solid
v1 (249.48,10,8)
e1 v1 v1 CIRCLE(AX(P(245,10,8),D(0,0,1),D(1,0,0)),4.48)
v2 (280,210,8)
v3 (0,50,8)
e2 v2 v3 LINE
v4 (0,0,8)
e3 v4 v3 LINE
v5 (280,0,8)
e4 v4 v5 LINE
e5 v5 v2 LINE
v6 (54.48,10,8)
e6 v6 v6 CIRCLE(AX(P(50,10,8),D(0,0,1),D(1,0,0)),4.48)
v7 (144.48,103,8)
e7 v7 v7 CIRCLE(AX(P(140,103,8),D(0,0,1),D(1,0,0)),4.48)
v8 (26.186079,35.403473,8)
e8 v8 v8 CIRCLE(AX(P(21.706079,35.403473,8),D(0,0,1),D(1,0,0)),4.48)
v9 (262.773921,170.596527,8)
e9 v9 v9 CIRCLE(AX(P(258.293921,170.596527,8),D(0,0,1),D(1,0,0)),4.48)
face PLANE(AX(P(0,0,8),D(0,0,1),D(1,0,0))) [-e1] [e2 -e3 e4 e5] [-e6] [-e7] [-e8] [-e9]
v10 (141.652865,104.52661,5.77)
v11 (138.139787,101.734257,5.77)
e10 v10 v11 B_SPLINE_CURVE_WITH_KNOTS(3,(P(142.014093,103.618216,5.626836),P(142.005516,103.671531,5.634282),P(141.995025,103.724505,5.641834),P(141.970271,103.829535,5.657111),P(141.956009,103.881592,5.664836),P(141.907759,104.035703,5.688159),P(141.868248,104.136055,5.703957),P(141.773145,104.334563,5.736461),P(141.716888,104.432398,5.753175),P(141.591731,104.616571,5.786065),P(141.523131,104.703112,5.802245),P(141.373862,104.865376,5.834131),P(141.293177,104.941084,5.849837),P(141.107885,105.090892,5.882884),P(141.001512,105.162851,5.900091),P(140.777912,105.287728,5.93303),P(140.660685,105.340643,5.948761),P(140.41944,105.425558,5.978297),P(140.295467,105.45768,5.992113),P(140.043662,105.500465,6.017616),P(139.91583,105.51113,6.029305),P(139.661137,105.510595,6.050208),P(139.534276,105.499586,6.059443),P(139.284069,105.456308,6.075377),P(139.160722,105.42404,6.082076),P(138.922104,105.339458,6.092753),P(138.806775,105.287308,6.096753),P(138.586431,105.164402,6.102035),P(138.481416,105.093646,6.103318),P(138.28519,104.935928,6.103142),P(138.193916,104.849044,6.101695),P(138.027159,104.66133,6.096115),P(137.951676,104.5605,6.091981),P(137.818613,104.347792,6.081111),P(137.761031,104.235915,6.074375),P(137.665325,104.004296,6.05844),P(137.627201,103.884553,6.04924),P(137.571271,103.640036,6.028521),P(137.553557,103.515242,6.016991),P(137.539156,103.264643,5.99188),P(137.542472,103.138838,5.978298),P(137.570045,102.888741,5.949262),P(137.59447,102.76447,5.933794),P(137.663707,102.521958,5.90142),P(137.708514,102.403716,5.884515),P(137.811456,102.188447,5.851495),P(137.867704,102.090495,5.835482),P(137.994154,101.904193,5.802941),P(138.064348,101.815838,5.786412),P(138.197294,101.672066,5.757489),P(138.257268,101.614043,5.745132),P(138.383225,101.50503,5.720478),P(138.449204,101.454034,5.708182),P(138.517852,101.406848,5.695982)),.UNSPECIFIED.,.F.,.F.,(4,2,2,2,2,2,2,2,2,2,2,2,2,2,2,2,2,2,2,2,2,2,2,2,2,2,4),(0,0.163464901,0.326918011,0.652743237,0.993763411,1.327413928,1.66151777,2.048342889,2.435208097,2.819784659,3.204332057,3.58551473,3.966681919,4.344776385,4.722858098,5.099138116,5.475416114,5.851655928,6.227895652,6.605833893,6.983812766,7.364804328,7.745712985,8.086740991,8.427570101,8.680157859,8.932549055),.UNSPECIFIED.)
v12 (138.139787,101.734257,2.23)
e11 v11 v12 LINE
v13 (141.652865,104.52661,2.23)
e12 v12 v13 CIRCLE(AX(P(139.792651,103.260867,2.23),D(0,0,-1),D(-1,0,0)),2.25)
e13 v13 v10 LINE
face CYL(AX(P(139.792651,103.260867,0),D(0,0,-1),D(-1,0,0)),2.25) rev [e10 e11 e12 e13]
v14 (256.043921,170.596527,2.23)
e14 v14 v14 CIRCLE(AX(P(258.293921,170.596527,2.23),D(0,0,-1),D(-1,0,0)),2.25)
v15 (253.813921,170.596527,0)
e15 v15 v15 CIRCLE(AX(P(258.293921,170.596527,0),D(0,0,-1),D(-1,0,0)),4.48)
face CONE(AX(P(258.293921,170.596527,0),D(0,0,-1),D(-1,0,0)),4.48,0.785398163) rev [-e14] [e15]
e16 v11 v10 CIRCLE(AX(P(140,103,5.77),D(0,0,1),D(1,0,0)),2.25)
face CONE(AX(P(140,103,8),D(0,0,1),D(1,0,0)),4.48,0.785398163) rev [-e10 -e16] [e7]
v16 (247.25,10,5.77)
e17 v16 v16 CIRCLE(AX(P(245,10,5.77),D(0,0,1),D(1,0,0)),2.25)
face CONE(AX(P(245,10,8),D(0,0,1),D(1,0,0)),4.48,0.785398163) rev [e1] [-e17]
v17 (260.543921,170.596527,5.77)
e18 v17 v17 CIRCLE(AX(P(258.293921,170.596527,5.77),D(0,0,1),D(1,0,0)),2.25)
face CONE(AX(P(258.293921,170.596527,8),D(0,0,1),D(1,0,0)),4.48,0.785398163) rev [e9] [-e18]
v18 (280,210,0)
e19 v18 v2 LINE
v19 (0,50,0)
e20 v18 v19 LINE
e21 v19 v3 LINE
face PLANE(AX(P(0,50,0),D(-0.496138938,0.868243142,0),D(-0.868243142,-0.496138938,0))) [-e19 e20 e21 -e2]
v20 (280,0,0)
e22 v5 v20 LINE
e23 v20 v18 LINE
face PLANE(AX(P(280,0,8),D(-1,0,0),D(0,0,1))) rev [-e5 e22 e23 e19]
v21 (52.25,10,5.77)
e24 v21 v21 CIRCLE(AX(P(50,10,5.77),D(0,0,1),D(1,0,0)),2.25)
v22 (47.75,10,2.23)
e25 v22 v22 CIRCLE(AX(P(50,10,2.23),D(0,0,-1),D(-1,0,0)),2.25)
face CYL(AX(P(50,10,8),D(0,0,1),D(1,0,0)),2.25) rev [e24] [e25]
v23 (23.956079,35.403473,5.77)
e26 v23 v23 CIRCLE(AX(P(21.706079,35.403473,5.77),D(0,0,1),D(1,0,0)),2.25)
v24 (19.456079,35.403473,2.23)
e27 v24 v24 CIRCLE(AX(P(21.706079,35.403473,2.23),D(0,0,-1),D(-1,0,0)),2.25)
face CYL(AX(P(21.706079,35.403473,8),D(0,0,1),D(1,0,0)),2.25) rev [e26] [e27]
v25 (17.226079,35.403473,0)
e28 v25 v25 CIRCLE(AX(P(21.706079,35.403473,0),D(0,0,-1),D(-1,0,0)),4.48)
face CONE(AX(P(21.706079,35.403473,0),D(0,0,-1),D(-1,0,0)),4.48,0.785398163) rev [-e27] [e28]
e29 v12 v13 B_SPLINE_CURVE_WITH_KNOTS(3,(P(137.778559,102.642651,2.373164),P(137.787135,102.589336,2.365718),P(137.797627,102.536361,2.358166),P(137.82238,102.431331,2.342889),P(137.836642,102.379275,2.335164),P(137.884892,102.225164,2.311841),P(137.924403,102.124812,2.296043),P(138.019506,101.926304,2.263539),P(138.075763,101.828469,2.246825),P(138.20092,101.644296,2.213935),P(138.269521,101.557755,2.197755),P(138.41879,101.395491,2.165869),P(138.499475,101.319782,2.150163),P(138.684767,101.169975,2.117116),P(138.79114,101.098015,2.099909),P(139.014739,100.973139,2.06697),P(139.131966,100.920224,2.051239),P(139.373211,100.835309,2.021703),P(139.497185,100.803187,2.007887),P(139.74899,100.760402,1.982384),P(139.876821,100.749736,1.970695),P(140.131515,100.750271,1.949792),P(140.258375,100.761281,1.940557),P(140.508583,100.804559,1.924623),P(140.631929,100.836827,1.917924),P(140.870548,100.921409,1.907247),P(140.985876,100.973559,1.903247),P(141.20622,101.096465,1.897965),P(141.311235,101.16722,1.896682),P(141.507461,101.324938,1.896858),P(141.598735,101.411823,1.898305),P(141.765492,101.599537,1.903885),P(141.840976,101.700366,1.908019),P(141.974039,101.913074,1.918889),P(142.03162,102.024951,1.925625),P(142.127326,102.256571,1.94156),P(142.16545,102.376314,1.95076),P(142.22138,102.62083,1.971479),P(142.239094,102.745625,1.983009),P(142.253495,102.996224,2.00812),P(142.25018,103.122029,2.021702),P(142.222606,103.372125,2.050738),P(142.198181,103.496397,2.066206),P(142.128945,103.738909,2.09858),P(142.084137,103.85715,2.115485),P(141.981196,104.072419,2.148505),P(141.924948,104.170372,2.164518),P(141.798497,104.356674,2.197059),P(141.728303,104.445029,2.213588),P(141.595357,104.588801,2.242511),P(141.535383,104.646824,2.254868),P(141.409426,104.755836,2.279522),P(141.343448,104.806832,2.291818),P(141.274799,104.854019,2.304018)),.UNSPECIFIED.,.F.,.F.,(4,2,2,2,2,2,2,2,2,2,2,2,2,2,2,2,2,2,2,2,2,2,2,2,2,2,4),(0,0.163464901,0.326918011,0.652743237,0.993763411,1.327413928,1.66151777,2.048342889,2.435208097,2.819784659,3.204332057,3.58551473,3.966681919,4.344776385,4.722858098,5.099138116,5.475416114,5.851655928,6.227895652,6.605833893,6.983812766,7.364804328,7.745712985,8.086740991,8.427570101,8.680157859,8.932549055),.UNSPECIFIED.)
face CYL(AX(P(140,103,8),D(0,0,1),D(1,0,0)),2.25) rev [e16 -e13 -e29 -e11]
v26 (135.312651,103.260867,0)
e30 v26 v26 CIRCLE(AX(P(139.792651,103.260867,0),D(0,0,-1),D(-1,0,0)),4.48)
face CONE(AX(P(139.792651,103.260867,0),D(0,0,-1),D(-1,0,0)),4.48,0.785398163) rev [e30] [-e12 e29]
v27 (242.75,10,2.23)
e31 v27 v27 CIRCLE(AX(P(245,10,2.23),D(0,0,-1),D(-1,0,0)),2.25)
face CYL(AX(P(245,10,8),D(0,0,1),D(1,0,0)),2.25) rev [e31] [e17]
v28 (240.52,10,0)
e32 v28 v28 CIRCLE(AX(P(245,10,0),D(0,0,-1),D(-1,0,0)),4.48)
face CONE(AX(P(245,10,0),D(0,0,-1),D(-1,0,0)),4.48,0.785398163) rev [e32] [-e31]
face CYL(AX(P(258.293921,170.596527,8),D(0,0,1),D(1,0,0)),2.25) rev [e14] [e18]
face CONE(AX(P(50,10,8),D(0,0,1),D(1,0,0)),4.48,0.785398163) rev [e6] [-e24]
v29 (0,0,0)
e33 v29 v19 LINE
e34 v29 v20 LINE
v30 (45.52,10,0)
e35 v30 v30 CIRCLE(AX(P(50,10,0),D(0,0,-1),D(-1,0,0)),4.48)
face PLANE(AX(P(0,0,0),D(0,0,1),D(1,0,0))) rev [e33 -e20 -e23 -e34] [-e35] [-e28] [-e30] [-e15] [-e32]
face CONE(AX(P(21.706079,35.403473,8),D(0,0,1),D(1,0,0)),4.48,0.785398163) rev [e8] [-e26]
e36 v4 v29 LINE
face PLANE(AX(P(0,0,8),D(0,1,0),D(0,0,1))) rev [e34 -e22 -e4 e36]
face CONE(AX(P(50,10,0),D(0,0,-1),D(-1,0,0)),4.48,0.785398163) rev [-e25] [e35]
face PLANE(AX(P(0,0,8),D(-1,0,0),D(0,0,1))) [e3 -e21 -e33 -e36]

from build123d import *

# Parameters (mm, degrees)
RESSALTO_EXTRUS_O3_DEPTH                       = 8
ESCAREADO_PARA_SFHCS_M42_D                     = 4.5
ESCAREADO_PARA_SFHCS_M42_CSINK_D               = 8.96
ESCAREADO_PARA_SFHCS_M42_CSINK_ANGLE           = 90
RESSALTO_EXTRUS_O5_DEPTH                       = 8
ESCAREADO_PARA_SFHCS_M44_D                     = 4.5
ESCAREADO_PARA_SFHCS_M44_CSINK_D               = 8.96
ESCAREADO_PARA_SFHCS_M44_CSINK_ANGLE           = 90
ESCAREADO_PARA_SFHCS_M46_D                     = 4.5
ESCAREADO_PARA_SFHCS_M46_CSINK_D               = 8.96
ESCAREADO_PARA_SFHCS_M46_CSINK_ANGLE           = 90
ESCAREADO_PARA_SFHCS_M47_D                     = 4.5
ESCAREADO_PARA_SFHCS_M47_CSINK_D               = 8.96
ESCAREADO_PARA_SFHCS_M47_CSINK_ANGLE           = 90
ESCAREADO_PARA_SFHCS_M47_ON_FACE_2_D           = 4.5
ESCAREADO_PARA_SFHCS_M47_ON_FACE_2_CSINK_D     = 8.96
ESCAREADO_PARA_SFHCS_M47_ON_FACE_2_CSINK_ANGLE = 90


# Read off the part's stored shape, not the designer's step: Escareado para SFHCS M45
with BuildPart() as part:
    # Esboço1 → Ressalto-extrusão3 (new body)
    with BuildSketch(Plane.XY):
        Polygon((0, 20), (280, 170), (0, 0), align=None)
        Polygon((280, 0), (280, 170), (0, 0), align=None)
    extrude(amount=RESSALTO_EXTRUS_O3_DEPTH)

    # Escareado para SFHCS M42 (through all)
    with Locations(Plane(origin=(50, 10, 8), x_dir=(1, 0, 0), z_dir=(0, 0, 1))):
        with Locations((0, 0), (195, 0)):
            CounterSinkHole(ESCAREADO_PARA_SFHCS_M42_D / 2, ESCAREADO_PARA_SFHCS_M42_CSINK_D / 2, counter_sink_angle=ESCAREADO_PARA_SFHCS_M42_CSINK_ANGLE)

    # Esboço6 → Ressalto-extrusão5 (add, through all)
    with BuildSketch(Plane.XY.offset(8)):
        Polygon((0, 20), (0, 50), (280, 210), (280, 170), align=None)
    extrude(amount=-RESSALTO_EXTRUS_O5_DEPTH)

    # Escareado para SFHCS M44 (through all)
    with Locations(Plane(origin=(21.706078553, 35.403473459, 8), x_dir=(1, 0, 0), z_dir=(0, 0, 1))):
        with Locations((0, 0), (236.587842894, 135.193053082)):
            CounterSinkHole(ESCAREADO_PARA_SFHCS_M44_D / 2, ESCAREADO_PARA_SFHCS_M44_CSINK_D / 2, counter_sink_angle=ESCAREADO_PARA_SFHCS_M44_CSINK_ANGLE)

    # Escareado para SFHCS M45 outline → Escareado para SFHCS M45 (revolve, cut)
    with BuildSketch(Plane(origin=(245, 10, 0), x_dir=(1, 0, 0), z_dir=(0, -1, 0))):
        Polygon((4.48, 0), (2.25, 2.23), (2.25, 0), align=None)
    revolve(axis=Axis((245, 10, 0), (0, 0, 1)), mode=Mode.SUBTRACT)

    # Escareado para SFHCS M46 (through all)
    with Locations(Plane(origin=(258.293921447, 170.596526541, 0), x_dir=(-1, 0, 0), z_dir=(0, 0, -1))):
        with Locations((0, 0), (236.587842894, -135.193053082), (208.293921447, -160.596526541)):
            CounterSinkHole(ESCAREADO_PARA_SFHCS_M46_D / 2, ESCAREADO_PARA_SFHCS_M46_CSINK_D / 2, counter_sink_angle=ESCAREADO_PARA_SFHCS_M46_CSINK_ANGLE)

    # Escareado para SFHCS M47 (through all)
    with Locations(Plane(origin=(140, 103, 8), x_dir=(1, 0, 0), z_dir=(0, 0, 1))):
        with Locations((0, 0)):
            CounterSinkHole(ESCAREADO_PARA_SFHCS_M47_D / 2, ESCAREADO_PARA_SFHCS_M47_CSINK_D / 2, counter_sink_angle=ESCAREADO_PARA_SFHCS_M47_CSINK_ANGLE)

    # Escareado para SFHCS M47 on face 2 (through all)
    with Locations(Plane(origin=(139.792651332, 103.260866722, 0), x_dir=(-1, 0, 0), z_dir=(0, 0, -1))):
        with Locations((0, 0)):
            CounterSinkHole(ESCAREADO_PARA_SFHCS_M47_ON_FACE_2_D / 2, ESCAREADO_PARA_SFHCS_M47_ON_FACE_2_CSINK_D / 2, counter_sink_angle=ESCAREADO_PARA_SFHCS_M47_ON_FACE_2_CSINK_ANGLE)


solid = part.part
